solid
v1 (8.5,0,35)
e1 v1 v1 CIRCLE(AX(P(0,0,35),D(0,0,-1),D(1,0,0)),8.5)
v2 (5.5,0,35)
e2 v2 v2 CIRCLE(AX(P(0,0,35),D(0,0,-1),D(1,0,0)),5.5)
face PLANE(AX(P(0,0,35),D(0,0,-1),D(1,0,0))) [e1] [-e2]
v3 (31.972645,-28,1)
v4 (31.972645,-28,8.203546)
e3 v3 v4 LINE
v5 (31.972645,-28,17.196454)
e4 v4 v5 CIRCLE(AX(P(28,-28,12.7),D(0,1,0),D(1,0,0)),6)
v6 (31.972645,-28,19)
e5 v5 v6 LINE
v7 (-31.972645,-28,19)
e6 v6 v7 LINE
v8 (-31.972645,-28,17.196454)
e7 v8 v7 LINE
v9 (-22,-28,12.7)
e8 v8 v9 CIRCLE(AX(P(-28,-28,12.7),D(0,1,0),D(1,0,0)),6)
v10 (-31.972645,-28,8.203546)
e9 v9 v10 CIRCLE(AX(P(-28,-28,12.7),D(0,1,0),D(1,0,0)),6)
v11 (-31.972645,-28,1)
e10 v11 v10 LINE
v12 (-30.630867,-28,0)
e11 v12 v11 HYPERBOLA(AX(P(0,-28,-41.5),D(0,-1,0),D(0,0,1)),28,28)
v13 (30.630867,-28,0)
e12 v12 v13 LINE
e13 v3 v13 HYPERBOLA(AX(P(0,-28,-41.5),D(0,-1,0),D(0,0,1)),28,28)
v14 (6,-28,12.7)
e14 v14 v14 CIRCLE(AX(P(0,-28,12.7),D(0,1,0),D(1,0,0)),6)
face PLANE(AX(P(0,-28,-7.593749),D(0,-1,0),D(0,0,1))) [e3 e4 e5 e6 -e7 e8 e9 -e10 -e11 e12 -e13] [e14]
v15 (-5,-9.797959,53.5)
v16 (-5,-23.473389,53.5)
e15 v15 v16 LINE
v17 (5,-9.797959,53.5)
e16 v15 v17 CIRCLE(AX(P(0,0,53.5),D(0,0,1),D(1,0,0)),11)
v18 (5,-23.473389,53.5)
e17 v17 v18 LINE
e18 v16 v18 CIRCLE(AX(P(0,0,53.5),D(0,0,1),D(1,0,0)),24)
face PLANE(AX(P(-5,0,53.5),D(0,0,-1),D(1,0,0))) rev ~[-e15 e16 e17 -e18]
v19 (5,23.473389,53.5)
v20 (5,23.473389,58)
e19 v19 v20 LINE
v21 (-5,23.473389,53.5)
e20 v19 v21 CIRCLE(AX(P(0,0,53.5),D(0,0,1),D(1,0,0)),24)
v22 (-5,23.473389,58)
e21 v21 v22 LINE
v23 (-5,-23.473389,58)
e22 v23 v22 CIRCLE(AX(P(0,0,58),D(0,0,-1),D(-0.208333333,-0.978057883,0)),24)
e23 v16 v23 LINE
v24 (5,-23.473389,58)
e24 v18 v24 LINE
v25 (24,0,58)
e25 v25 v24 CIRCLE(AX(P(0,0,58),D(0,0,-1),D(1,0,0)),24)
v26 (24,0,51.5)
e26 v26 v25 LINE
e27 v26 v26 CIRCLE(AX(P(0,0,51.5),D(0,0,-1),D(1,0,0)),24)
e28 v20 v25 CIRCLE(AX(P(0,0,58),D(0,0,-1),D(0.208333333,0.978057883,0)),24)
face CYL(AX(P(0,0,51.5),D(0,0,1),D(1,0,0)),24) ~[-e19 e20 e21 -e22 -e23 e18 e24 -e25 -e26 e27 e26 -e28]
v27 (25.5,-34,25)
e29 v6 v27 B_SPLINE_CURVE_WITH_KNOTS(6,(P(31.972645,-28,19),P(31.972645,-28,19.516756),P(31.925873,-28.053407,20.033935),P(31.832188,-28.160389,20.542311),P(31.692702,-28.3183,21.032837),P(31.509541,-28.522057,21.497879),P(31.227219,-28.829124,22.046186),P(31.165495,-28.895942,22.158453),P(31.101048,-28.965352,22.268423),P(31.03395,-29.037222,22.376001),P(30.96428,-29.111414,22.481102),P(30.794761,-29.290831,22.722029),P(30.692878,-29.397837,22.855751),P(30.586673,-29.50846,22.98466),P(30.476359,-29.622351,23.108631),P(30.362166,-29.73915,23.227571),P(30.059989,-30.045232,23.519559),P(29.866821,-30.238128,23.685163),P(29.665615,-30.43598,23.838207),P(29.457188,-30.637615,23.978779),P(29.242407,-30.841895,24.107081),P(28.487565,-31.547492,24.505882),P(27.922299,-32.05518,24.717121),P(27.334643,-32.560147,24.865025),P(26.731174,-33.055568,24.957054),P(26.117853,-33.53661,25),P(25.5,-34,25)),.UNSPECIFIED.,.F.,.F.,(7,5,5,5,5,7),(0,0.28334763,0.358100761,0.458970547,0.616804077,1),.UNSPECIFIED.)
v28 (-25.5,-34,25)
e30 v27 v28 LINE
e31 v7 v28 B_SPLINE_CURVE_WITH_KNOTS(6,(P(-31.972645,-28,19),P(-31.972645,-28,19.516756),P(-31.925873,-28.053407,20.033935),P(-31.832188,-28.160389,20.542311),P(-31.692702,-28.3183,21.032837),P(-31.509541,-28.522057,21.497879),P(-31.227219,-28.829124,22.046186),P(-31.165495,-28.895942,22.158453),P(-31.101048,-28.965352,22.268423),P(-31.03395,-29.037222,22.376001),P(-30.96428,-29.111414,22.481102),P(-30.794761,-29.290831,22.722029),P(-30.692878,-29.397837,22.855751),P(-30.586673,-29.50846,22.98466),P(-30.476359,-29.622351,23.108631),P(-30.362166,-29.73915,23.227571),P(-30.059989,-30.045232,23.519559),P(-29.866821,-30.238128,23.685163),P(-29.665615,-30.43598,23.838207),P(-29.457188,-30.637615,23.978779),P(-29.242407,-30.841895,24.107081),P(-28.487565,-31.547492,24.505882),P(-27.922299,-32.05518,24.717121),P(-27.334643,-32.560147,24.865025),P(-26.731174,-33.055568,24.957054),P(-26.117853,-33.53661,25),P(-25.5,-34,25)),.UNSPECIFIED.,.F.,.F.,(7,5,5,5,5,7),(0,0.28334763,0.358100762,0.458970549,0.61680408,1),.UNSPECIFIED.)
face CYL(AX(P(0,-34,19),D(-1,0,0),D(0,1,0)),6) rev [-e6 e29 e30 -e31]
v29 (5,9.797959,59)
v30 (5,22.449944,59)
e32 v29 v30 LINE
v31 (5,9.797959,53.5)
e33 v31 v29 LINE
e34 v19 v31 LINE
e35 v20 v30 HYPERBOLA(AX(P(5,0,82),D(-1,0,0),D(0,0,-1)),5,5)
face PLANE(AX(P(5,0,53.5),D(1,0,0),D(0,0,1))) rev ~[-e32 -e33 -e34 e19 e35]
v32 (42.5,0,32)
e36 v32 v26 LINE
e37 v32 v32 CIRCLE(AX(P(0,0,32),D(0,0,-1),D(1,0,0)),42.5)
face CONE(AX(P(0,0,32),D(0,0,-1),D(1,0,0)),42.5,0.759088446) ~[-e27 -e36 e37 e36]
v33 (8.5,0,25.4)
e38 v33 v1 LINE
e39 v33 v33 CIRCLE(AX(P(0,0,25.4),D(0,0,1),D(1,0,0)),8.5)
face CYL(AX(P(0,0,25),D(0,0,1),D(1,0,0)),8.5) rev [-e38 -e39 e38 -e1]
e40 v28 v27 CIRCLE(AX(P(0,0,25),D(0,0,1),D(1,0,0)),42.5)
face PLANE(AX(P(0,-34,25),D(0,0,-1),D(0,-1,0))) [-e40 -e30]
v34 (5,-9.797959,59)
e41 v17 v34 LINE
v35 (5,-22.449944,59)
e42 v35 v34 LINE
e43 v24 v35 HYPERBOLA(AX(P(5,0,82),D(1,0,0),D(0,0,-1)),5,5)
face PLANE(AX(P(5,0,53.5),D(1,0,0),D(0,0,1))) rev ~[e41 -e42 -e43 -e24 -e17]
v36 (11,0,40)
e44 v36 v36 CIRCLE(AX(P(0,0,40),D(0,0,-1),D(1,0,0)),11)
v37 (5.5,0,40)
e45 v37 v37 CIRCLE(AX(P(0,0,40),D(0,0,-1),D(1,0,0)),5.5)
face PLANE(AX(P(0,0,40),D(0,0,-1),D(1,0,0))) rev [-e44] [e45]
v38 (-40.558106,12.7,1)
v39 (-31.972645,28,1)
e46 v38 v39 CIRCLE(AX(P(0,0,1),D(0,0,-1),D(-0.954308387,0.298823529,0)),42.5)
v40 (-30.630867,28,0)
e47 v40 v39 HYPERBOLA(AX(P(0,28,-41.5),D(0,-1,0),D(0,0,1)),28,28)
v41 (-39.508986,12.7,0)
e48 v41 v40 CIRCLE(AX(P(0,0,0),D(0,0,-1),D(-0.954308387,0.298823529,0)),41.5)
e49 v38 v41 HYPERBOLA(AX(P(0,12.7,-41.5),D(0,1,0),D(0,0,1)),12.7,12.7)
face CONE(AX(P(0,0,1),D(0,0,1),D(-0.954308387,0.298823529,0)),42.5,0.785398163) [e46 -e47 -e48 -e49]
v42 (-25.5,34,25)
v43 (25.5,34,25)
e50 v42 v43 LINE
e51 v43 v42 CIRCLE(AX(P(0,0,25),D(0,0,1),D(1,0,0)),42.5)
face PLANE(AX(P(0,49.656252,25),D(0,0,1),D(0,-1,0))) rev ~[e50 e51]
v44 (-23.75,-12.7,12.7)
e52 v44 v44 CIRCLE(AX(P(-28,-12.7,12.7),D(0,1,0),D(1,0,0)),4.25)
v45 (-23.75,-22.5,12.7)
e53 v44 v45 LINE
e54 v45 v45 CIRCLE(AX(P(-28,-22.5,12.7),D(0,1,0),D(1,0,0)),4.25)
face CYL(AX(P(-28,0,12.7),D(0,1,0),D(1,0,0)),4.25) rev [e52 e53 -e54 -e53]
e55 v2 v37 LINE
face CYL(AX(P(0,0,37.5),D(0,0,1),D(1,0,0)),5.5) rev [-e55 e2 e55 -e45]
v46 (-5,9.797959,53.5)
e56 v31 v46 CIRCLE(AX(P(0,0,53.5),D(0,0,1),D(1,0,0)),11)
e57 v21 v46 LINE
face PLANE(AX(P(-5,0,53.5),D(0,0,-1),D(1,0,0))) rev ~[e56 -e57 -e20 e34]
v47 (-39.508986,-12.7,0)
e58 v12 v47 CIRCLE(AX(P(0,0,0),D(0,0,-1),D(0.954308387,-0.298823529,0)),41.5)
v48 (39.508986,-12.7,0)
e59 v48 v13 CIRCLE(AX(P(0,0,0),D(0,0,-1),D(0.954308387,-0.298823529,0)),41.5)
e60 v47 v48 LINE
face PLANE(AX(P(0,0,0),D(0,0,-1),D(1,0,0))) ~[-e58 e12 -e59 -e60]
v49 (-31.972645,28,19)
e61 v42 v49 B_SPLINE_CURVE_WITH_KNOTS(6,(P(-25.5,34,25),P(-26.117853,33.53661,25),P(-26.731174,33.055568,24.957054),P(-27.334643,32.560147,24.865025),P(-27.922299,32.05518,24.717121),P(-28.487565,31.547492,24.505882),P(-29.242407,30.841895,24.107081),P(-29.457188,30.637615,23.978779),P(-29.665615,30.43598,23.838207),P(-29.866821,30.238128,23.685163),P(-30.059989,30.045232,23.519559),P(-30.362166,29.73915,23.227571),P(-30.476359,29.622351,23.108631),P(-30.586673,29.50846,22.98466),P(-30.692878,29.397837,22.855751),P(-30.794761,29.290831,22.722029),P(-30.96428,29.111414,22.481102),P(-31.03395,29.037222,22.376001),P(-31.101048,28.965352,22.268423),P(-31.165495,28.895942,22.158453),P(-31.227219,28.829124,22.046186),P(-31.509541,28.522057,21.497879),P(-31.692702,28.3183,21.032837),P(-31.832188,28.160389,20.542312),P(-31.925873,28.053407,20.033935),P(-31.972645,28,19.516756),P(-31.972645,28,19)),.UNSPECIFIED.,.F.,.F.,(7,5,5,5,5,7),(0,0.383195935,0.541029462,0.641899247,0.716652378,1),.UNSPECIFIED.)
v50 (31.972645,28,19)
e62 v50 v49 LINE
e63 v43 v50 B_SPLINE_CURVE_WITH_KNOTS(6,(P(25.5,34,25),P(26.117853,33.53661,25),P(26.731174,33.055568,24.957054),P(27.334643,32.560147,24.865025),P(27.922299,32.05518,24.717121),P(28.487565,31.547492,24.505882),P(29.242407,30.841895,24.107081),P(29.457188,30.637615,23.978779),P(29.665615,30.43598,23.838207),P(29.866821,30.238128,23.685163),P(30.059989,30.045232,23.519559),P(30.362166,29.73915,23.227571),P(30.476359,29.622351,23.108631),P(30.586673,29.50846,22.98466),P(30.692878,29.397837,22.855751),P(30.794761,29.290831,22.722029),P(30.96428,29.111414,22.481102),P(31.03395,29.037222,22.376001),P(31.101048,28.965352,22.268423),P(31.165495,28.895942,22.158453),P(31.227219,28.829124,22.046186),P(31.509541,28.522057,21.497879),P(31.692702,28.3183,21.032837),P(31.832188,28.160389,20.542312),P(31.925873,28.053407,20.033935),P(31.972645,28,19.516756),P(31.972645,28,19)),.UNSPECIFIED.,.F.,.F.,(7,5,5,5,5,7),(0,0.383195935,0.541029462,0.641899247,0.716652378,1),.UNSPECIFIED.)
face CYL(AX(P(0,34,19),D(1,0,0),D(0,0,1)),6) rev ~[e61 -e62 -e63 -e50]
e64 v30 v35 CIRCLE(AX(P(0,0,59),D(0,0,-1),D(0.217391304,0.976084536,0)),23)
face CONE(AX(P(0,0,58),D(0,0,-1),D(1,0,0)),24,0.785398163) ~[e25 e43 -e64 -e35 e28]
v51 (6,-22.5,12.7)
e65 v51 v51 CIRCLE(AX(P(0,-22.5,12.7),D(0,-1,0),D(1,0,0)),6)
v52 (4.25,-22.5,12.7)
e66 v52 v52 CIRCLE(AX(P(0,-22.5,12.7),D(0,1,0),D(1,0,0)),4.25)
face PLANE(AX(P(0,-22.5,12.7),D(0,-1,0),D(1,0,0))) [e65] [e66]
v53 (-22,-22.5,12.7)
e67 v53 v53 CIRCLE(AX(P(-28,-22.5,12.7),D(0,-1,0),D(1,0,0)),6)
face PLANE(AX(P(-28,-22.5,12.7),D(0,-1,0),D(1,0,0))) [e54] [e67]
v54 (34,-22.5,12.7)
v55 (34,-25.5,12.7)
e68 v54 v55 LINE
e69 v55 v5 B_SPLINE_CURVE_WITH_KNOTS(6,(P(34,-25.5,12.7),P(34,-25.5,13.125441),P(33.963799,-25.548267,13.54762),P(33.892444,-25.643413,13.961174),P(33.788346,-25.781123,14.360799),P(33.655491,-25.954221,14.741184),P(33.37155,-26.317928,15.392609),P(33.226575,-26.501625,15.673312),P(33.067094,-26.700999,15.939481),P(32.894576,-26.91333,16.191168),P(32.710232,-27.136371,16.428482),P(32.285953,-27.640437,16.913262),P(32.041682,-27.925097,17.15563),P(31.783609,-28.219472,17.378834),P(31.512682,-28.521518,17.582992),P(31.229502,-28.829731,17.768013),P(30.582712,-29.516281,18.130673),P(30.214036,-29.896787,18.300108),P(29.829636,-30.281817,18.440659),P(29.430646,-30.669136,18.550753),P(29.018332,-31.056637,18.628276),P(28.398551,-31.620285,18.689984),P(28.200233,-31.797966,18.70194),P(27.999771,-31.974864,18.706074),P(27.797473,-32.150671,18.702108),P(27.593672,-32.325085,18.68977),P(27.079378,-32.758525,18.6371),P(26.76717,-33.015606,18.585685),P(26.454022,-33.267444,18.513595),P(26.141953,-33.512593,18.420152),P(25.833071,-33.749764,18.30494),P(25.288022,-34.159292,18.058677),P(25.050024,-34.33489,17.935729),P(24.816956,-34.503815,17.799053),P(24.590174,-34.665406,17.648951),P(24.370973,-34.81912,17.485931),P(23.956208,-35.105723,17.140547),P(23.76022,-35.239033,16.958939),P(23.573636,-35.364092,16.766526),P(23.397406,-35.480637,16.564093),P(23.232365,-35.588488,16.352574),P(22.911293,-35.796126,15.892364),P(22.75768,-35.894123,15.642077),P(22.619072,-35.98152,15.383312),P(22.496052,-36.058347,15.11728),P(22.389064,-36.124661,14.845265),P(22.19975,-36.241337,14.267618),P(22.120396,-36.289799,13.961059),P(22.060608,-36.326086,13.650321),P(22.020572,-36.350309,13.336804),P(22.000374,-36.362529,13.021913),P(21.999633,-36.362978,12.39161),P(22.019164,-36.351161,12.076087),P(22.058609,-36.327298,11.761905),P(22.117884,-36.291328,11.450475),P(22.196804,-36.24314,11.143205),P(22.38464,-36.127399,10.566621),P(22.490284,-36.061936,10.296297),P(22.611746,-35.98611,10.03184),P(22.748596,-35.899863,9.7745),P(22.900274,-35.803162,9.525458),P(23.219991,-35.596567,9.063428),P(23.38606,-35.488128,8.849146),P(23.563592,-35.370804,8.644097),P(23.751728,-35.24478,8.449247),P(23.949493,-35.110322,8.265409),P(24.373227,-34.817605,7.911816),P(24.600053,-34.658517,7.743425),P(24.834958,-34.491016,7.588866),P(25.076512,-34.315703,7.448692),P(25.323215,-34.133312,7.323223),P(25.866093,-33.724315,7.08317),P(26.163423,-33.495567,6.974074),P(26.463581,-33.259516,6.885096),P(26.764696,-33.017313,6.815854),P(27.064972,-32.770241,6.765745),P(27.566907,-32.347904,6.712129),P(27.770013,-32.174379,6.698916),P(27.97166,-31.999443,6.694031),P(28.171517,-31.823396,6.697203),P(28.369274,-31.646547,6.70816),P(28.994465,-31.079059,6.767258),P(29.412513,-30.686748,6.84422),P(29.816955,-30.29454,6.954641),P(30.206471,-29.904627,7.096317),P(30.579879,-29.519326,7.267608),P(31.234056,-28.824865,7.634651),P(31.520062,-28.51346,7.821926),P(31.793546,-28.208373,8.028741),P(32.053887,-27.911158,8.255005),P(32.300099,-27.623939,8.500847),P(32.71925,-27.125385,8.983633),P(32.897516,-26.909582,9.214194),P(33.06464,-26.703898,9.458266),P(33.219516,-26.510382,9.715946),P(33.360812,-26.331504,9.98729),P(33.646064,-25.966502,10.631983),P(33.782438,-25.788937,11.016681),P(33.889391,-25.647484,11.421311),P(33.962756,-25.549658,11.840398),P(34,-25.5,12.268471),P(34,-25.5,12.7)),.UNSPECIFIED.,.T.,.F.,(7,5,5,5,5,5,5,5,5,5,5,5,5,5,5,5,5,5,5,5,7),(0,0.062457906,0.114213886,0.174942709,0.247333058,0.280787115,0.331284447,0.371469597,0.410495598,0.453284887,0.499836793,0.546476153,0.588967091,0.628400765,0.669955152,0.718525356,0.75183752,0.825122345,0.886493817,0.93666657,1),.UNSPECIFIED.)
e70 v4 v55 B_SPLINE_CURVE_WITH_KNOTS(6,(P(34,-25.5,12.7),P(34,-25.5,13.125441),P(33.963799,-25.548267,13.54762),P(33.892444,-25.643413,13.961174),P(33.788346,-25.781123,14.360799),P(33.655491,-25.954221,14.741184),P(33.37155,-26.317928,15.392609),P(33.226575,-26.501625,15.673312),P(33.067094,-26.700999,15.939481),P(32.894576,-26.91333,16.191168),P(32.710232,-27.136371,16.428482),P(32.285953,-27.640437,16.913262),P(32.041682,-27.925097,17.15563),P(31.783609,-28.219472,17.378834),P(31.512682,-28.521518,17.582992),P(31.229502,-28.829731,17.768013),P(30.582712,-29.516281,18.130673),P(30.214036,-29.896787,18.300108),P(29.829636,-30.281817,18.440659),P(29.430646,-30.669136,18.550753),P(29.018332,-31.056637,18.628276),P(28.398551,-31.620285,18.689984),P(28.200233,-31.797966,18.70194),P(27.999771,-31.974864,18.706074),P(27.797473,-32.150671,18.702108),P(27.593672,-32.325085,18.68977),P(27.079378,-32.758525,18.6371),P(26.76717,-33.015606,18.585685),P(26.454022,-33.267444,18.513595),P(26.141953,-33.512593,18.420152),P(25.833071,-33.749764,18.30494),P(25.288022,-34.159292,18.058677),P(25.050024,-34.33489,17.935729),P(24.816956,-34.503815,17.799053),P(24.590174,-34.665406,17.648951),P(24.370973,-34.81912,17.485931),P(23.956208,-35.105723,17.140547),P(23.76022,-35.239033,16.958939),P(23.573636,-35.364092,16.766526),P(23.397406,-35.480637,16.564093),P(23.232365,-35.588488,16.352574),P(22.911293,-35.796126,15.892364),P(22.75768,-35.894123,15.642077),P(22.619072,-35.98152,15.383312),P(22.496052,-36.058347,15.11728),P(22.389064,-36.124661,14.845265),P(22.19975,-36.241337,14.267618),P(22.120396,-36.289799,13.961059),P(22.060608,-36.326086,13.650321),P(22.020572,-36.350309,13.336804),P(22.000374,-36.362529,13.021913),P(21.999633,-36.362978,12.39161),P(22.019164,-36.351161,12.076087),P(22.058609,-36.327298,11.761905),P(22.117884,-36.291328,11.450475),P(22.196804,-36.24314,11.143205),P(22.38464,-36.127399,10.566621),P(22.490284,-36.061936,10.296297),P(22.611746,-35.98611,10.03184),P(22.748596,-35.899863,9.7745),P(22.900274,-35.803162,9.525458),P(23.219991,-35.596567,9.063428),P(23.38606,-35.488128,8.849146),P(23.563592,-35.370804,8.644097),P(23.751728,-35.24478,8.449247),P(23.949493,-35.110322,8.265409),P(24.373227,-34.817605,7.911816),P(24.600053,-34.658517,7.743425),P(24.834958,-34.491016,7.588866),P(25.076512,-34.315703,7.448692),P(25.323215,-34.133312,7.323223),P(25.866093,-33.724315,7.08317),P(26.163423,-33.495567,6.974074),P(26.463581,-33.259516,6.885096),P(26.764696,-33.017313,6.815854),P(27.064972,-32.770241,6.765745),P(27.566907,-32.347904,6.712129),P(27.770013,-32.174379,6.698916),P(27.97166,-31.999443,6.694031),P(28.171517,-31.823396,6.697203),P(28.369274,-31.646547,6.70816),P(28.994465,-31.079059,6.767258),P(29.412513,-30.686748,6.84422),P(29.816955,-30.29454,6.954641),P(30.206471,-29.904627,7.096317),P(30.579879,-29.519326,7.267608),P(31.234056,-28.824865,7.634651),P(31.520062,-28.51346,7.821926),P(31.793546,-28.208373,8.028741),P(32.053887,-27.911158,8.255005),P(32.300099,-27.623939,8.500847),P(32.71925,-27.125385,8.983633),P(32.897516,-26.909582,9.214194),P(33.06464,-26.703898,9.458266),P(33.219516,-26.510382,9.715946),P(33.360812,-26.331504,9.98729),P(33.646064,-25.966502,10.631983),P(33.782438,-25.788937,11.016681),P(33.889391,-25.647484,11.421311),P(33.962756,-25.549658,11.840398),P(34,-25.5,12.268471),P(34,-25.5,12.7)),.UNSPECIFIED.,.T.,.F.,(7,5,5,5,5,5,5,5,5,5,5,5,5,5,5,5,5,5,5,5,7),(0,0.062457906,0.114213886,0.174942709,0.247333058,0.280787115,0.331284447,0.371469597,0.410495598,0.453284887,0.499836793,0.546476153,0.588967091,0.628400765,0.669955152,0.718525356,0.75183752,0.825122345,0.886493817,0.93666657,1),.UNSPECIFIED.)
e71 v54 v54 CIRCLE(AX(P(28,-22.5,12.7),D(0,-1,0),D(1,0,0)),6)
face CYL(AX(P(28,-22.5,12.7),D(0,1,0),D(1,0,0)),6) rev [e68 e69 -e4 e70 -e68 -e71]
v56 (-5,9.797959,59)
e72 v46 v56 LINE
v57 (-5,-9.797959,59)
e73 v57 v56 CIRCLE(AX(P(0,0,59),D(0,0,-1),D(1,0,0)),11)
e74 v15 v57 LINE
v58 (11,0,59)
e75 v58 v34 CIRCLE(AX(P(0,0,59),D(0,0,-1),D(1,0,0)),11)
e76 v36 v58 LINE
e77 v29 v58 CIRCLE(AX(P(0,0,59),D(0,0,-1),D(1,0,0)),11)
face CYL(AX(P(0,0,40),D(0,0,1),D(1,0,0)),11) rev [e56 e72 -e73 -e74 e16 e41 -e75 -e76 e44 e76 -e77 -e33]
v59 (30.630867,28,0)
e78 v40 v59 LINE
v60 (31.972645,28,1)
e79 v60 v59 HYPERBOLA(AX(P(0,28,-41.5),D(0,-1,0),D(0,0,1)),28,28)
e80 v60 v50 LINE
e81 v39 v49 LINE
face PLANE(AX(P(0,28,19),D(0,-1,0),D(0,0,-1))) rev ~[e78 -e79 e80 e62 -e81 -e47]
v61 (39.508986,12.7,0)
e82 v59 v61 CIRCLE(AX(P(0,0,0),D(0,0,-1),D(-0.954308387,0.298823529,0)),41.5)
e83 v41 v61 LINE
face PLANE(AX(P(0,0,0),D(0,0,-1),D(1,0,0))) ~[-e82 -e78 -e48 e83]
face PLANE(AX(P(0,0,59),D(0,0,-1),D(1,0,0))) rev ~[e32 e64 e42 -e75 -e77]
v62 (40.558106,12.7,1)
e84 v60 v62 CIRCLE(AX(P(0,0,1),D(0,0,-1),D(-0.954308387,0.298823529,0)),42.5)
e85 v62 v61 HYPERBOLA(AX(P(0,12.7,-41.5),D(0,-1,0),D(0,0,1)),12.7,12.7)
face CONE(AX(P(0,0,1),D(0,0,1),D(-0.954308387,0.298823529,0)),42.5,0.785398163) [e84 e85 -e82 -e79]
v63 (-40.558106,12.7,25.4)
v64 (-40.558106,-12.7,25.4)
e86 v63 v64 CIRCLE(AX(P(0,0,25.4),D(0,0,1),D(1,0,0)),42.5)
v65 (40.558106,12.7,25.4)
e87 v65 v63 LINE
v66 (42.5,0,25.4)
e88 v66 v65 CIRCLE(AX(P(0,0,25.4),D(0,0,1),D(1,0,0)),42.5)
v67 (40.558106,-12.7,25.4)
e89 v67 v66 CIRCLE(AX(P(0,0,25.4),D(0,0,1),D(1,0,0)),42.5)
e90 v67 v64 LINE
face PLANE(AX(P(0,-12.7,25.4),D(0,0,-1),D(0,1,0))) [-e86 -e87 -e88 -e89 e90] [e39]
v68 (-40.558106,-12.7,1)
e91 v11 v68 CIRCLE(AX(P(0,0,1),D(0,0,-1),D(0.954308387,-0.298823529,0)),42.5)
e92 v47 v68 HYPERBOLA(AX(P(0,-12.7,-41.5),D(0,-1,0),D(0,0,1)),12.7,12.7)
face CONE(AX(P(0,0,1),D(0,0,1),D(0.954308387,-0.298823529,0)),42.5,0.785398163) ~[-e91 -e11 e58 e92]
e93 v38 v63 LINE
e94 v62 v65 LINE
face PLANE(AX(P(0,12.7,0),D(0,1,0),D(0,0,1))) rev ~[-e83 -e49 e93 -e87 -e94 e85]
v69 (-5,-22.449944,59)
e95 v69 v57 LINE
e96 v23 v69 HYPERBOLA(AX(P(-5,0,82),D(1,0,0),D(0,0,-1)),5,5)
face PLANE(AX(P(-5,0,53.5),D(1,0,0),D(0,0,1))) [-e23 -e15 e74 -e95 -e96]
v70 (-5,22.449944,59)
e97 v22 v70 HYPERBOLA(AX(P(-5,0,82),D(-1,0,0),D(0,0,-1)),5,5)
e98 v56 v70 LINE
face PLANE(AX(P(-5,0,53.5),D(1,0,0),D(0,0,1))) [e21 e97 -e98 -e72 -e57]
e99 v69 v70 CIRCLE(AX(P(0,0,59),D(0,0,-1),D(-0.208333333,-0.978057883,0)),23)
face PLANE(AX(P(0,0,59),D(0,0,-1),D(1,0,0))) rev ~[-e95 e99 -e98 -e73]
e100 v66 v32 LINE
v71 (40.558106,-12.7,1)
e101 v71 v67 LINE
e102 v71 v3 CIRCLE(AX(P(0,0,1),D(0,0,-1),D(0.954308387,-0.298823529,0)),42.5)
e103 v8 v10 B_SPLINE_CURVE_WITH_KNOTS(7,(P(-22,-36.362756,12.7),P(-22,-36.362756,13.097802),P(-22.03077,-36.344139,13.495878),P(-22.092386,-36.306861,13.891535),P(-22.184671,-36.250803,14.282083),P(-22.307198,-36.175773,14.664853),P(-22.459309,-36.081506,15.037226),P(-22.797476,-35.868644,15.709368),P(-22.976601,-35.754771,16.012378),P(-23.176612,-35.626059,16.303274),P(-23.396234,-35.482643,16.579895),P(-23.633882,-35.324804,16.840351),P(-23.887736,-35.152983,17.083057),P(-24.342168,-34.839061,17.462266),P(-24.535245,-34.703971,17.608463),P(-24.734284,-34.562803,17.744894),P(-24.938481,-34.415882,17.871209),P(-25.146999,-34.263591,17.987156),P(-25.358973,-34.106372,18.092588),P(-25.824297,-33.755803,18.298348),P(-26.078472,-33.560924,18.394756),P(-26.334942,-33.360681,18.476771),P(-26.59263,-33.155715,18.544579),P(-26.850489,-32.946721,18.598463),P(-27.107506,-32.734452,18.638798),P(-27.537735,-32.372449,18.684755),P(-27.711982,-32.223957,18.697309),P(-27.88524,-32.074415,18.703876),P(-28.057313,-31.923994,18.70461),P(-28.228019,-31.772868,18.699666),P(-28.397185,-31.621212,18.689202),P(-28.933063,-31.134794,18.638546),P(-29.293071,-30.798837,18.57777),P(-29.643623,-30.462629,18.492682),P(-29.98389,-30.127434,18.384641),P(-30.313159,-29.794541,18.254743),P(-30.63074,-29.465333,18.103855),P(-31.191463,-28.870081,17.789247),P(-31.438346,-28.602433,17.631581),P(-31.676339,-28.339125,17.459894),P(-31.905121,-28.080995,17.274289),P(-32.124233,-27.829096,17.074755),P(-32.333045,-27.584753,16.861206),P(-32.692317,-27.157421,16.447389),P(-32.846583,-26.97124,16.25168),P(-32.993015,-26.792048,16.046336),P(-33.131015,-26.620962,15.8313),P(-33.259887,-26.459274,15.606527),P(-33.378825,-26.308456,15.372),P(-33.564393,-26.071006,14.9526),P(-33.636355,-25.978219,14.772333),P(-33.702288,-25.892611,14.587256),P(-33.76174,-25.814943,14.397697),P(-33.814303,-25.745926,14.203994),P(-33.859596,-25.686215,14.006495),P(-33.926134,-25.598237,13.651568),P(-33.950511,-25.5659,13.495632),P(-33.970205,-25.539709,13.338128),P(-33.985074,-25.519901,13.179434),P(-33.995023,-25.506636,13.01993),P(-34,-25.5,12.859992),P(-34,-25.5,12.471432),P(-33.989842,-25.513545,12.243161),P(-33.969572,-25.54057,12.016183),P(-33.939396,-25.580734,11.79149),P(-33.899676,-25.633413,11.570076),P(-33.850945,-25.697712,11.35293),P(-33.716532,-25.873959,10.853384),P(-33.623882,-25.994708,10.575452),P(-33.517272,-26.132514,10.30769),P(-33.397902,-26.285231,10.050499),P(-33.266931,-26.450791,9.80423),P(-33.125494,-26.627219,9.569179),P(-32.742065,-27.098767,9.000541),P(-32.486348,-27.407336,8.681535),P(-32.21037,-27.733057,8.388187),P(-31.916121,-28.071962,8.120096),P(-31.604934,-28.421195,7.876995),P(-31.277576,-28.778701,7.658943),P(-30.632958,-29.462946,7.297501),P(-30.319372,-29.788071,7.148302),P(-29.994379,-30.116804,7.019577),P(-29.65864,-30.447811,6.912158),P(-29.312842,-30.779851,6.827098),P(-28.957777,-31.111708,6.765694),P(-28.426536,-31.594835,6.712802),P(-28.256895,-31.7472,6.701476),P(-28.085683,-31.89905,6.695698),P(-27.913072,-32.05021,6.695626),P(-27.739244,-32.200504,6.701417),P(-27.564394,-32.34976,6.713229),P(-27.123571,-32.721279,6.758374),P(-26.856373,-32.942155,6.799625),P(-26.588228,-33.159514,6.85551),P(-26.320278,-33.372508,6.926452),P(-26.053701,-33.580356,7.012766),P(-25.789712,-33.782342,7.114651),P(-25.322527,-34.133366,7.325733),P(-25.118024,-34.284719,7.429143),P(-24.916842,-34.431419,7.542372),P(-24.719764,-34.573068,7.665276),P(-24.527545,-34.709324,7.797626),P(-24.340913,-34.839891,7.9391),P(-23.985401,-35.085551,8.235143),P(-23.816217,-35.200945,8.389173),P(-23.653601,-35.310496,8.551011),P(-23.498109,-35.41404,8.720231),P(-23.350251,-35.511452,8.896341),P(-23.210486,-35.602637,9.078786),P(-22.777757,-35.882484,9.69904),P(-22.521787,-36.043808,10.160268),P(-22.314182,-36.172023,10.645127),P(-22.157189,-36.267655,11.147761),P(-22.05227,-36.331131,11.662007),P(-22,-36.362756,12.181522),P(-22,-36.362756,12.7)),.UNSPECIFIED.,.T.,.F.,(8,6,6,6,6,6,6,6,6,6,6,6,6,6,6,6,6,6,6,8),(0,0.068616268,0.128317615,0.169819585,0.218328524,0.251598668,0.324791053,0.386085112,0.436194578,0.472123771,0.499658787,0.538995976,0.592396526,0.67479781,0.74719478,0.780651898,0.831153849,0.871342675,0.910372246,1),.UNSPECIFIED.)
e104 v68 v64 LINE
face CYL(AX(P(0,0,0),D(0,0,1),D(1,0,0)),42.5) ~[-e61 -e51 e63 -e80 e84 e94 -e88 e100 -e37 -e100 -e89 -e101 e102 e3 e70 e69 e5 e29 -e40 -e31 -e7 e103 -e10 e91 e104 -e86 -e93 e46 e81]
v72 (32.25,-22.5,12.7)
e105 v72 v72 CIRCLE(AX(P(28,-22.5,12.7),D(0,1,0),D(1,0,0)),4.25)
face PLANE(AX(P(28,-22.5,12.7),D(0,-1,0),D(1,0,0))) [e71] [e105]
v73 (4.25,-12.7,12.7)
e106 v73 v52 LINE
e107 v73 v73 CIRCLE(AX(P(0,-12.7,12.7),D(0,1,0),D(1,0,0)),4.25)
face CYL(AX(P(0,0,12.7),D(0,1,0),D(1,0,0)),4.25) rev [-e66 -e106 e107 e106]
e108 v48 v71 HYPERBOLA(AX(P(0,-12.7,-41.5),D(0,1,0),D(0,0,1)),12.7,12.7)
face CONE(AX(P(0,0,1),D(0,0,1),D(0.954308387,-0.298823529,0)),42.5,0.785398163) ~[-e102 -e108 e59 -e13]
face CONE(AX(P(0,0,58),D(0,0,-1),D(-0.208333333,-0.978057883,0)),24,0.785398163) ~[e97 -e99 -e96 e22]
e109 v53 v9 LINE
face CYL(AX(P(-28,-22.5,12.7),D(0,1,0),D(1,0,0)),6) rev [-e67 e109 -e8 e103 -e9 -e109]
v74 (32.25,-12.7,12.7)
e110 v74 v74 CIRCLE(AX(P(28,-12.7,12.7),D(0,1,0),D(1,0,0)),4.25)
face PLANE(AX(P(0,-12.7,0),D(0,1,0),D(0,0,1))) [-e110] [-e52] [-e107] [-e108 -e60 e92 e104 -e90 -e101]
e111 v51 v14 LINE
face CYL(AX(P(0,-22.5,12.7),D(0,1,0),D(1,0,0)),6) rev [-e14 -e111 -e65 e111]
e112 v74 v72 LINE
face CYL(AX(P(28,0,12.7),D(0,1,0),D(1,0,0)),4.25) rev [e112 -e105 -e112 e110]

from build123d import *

# Parameters (mm, degrees)
F2_W      = 5.5
F2_H      = 5
F4_W      = 25.4
F4_H      = 25.4
F5_DEPTH  = 50
F6_W      = 10
F6_H      = 5.5
F7_DEPTH  = 25
F8_R      = 4.25
F9_DEPTH  = 50
F10_SIZE  = 1
F12_R     = 6
F13_DEPTH = 25
F15_DEPTH = 40


# Not quite as in the source:
# - a feature names something its author has since deleted; it is built from what else it names


with BuildPart() as f1:
    # F0 (on Front) → F1 (revolve)
    with BuildSketch(Plane.XZ):
        Polygon((0, 59), (0, 0), (42.5, 0), (42.5, 32), (24, 51.5), (24, 59), align=None)
    revolve(axis=Axis((0, 0, 29.5), (0, 0, -1)))

    # F2 (on Front) → F3 (revolve, cut)
    with BuildSketch(Plane.XZ):
        Polygon((5.5, 35), (0, 35), (0, 25), (8.5, 25), (8.5, 35), align=None)
        with Locations((2.75, 37.5)):
            Rectangle(F2_W, F2_H)
        Polygon((11, 59), (0, 59), (0, 40), (5.5, 40), (11, 40), align=None)
    revolve(axis=Axis((0, 0, 30), (0, 0, -1)), mode=Mode.SUBTRACT)

    # F4 (on Right) → F5 (cut, symmetric)
    with BuildSketch(Plane.YZ):
        with Locations((0, 12.7)):
            Rectangle(F4_W, F4_H)
    extrude(amount=F5_DEPTH, both=True, mode=Mode.SUBTRACT)

    # F6 (on Front) → F7 (cut, symmetric)
    with BuildSketch(Plane.XZ):
        with Locations((0, 56.25)):
            Rectangle(F6_W, F6_H)
    extrude(amount=F7_DEPTH, both=True, mode=Mode.SUBTRACT)

    # F8 (on Front) → F9 (cut)
    with BuildSketch(Plane.XZ):
        with Locations((0, 12.7)):
            Circle(F8_R)
        with Locations((28, 12.7)):
            Circle(F8_R)
        with Locations((-28, 12.7)):
            Circle(F8_R)
    extrude(amount=F9_DEPTH, mode=Mode.SUBTRACT)

    # F10
    f10_edges = [f1.edges().sort_by_distance(p)[0] for p in [
        (0, -42.5, 0),
        (0, 42.5, 0),
        (-24, 0, 59),
        (18.654758, -15.099669, 59),
        (18.654758, 15.099669, 59),
    ]]
    chamfer(f10_edges, length=F10_SIZE)

    # F12 (on offset) → F13 (cut)
    with BuildSketch(Plane.XZ.offset(22.5)):
        with Locations((0, 12.7)):
            Circle(F12_R)
        with Locations((-28, 12.7)):
            Circle(F12_R)
        with Locations((28, 12.7)):
            Circle(F12_R)
    extrude(amount=F13_DEPTH, mode=Mode.SUBTRACT)

    # F14 (on Right) → F15 (cut, symmetric)
    with BuildSketch(Plane.YZ):
        with BuildLine():
            Line((-34, 25), (-49.6562516332, 25))
            Line((-49.6562516332, 25), (-49.6562516332, -7.5937491908))
            Line((-49.6562516332, -7.5937491908), (-28, -7.5937491908))
            Line((-28, -7.5937491908), (-28, 19))
            ThreePointArc((-28, 19), (-29.7573593129, 23.2426406871), (-34, 25))
        make_face()
        with BuildLine():
            Line((49.6562516332, -7.5937491908), (49.6562516332, 25))
            Line((49.6562516332, 25), (34, 25))
            ThreePointArc((34, 25), (29.7573593129, 23.2426406871), (28, 19))
            Line((28, 19), (28, -7.5937491908))
            Line((28, -7.5937491908), (49.6562516332, -7.5937491908))
        make_face()
    extrude(amount=F15_DEPTH, both=True, mode=Mode.SUBTRACT)


solid = f1.part
